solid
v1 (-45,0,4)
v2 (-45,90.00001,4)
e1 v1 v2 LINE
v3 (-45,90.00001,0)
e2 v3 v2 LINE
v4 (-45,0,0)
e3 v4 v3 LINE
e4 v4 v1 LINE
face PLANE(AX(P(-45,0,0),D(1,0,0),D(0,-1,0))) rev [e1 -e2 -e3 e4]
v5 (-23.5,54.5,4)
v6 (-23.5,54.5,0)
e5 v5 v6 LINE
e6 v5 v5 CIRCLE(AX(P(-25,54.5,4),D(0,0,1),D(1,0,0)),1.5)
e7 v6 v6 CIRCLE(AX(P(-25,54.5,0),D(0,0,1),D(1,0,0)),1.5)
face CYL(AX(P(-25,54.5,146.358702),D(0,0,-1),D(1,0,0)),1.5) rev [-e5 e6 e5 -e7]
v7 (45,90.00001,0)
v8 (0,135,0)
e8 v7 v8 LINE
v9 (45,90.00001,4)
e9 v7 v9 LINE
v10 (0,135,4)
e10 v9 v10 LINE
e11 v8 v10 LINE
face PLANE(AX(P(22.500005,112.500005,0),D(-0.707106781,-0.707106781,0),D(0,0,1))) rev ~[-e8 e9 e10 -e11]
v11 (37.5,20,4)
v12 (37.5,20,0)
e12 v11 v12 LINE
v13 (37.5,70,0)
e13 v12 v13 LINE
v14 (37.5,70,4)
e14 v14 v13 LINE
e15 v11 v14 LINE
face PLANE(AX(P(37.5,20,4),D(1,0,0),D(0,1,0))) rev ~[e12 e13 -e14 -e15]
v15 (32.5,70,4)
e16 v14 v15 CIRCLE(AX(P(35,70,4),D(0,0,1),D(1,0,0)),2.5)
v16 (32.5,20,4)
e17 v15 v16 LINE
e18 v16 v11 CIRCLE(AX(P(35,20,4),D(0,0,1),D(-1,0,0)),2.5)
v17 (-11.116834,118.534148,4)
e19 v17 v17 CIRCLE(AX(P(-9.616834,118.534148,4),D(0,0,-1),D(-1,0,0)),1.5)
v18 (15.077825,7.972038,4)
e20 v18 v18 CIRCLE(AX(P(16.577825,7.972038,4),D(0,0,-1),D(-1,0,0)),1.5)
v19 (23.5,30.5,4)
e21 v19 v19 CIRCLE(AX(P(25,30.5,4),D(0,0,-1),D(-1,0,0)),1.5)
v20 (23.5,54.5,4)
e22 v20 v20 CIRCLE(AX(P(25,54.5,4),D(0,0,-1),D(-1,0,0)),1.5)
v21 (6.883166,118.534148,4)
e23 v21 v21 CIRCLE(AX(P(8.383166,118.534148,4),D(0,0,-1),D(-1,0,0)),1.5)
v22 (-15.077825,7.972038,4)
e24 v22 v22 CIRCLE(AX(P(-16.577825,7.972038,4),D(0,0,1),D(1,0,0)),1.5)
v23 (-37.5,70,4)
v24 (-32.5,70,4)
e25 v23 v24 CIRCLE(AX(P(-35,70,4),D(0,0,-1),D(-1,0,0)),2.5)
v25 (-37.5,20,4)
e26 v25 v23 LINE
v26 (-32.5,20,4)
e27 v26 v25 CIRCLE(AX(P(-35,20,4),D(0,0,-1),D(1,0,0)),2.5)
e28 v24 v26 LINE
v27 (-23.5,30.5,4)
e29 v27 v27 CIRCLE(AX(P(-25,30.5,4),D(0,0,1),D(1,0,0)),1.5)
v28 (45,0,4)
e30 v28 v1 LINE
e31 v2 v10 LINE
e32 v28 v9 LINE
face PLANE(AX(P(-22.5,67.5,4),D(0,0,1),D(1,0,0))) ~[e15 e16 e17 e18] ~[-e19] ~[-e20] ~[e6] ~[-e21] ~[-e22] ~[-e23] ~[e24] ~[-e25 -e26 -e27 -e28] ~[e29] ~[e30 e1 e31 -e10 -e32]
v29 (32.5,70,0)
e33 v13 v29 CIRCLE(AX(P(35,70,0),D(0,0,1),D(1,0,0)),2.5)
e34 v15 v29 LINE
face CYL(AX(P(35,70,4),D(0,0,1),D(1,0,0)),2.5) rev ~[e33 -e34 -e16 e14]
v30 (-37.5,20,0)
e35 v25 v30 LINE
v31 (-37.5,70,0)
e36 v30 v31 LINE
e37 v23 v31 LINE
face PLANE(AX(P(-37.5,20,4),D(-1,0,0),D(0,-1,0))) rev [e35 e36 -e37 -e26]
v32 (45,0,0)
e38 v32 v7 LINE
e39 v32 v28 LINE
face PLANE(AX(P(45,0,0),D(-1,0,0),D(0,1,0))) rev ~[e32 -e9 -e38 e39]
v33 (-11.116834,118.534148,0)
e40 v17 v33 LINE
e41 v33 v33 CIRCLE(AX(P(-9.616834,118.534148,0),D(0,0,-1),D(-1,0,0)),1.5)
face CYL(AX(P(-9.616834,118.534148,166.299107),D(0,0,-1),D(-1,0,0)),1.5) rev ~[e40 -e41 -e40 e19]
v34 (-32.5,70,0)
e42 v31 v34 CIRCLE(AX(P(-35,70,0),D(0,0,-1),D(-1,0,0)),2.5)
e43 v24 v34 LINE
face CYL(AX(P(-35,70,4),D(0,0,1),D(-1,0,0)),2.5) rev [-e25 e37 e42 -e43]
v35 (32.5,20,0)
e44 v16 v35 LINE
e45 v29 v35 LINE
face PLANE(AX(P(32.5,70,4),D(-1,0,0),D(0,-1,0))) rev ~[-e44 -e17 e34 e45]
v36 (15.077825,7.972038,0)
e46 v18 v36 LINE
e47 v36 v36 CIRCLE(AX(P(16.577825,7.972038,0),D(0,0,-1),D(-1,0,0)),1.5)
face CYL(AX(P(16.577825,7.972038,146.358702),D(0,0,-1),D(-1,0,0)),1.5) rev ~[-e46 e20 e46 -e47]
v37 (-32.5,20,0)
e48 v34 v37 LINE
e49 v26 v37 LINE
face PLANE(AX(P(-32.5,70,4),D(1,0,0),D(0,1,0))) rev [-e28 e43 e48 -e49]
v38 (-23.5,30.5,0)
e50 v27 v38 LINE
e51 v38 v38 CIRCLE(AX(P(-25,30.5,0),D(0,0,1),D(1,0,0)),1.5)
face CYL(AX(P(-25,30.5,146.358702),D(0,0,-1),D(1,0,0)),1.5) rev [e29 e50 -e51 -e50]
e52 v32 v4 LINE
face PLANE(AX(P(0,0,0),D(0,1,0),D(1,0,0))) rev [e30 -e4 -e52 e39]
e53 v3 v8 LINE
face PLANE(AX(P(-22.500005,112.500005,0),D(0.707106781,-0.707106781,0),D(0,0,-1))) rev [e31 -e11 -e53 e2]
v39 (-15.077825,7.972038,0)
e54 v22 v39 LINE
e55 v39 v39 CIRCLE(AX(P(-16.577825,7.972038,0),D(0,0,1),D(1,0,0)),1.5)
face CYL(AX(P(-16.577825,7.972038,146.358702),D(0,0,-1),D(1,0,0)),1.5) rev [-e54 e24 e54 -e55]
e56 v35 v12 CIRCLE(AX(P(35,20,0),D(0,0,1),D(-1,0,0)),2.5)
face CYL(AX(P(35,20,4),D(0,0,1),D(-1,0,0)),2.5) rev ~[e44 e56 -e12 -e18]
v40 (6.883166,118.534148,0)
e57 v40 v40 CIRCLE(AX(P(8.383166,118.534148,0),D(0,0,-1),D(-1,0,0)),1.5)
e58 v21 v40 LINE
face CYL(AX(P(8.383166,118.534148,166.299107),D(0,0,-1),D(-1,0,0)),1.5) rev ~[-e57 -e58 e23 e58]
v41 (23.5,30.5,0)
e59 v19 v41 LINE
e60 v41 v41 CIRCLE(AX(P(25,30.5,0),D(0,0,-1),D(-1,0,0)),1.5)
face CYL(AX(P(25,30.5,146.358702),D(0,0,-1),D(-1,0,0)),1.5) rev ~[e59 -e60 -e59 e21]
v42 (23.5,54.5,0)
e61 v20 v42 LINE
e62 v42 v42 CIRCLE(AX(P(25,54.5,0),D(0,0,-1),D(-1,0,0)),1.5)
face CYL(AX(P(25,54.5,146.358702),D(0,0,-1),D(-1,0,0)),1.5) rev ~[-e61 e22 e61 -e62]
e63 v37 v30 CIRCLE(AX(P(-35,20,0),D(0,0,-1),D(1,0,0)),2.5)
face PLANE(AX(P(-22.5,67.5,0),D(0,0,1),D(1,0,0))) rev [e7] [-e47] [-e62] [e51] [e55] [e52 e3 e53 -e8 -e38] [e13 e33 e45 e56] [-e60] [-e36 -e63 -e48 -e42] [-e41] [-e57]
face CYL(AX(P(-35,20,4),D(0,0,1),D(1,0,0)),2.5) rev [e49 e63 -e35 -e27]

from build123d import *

# Parameters (mm, degrees)
F0_W     = 45
F0_H     = 135
F1_DEPTH = 4
F2_SIZE  = 44.99999
F5_DEPTH = 39.1207225621
F7_D     = 3
F9_D     = 3
F11_D    = 3
F14_D    = 3


# Not quite as in the source:
# - a fillet or chamfer is up to 0.001 mm smaller than in the source, because OpenCascade refuses the exact size


with BuildPart() as f1:
    # F0 (on Top) → F1 (new body)
    with BuildSketch(Plane.XY):
        with Locations((22.5, 67.5)):
            Rectangle(F0_W, F0_H)
    extrude(amount=F1_DEPTH)

    # F2 (size 45 in the source; OpenCascade refuses exactly that, so slightly less here)
    f2_edges = [f1.edges().sort_by_distance(p)[0] for p in [
        (45, 135, 2),
    ]]
    chamfer(f2_edges, length=F2_SIZE)

    # F4 (on face) → F5 (cut)
    with BuildSketch(Plane.XY.offset(4)):
        with BuildLine():
            ThreePointArc((32.5, 20), (35, 17.5), (37.5, 20))
            Line((37.5, 20), (37.5, 70))
            ThreePointArc((37.5, 70), (35, 72.5), (32.5, 70))
            Line((32.5, 70), (32.5, 20))
        make_face()
    extrude(amount=-F5_DEPTH, mode=Mode.SUBTRACT)

    # F7 (through all)
    with Locations(Plane.XY.offset(4)):
        with Locations((16.5778252002, 7.9720381196)):
            Hole(F7_D / 2)

    # F9 (through all)
    with Locations(Plane.XY.offset(4)):
        with Locations((25, 30.5)):
            Hole(F9_D / 2)

    # F11 (through all)
    with Locations(Plane.XY.offset(4)):
        with Locations((25, 54.5)):
            Hole(F11_D / 2)

    # F12: F1 across plane


with BuildPart() as f1_1:
    add(f1.part)
    add(f1.part.mirror(Plane.YZ))

    # F14 (through all)
    with Locations(Plane.XY.offset(4)):
        with Locations((-9.6168344989, 118.5341477394), (8.3831655011, 118.5341477394)):
            Hole(F14_D / 2)


solid = f1_1.part
